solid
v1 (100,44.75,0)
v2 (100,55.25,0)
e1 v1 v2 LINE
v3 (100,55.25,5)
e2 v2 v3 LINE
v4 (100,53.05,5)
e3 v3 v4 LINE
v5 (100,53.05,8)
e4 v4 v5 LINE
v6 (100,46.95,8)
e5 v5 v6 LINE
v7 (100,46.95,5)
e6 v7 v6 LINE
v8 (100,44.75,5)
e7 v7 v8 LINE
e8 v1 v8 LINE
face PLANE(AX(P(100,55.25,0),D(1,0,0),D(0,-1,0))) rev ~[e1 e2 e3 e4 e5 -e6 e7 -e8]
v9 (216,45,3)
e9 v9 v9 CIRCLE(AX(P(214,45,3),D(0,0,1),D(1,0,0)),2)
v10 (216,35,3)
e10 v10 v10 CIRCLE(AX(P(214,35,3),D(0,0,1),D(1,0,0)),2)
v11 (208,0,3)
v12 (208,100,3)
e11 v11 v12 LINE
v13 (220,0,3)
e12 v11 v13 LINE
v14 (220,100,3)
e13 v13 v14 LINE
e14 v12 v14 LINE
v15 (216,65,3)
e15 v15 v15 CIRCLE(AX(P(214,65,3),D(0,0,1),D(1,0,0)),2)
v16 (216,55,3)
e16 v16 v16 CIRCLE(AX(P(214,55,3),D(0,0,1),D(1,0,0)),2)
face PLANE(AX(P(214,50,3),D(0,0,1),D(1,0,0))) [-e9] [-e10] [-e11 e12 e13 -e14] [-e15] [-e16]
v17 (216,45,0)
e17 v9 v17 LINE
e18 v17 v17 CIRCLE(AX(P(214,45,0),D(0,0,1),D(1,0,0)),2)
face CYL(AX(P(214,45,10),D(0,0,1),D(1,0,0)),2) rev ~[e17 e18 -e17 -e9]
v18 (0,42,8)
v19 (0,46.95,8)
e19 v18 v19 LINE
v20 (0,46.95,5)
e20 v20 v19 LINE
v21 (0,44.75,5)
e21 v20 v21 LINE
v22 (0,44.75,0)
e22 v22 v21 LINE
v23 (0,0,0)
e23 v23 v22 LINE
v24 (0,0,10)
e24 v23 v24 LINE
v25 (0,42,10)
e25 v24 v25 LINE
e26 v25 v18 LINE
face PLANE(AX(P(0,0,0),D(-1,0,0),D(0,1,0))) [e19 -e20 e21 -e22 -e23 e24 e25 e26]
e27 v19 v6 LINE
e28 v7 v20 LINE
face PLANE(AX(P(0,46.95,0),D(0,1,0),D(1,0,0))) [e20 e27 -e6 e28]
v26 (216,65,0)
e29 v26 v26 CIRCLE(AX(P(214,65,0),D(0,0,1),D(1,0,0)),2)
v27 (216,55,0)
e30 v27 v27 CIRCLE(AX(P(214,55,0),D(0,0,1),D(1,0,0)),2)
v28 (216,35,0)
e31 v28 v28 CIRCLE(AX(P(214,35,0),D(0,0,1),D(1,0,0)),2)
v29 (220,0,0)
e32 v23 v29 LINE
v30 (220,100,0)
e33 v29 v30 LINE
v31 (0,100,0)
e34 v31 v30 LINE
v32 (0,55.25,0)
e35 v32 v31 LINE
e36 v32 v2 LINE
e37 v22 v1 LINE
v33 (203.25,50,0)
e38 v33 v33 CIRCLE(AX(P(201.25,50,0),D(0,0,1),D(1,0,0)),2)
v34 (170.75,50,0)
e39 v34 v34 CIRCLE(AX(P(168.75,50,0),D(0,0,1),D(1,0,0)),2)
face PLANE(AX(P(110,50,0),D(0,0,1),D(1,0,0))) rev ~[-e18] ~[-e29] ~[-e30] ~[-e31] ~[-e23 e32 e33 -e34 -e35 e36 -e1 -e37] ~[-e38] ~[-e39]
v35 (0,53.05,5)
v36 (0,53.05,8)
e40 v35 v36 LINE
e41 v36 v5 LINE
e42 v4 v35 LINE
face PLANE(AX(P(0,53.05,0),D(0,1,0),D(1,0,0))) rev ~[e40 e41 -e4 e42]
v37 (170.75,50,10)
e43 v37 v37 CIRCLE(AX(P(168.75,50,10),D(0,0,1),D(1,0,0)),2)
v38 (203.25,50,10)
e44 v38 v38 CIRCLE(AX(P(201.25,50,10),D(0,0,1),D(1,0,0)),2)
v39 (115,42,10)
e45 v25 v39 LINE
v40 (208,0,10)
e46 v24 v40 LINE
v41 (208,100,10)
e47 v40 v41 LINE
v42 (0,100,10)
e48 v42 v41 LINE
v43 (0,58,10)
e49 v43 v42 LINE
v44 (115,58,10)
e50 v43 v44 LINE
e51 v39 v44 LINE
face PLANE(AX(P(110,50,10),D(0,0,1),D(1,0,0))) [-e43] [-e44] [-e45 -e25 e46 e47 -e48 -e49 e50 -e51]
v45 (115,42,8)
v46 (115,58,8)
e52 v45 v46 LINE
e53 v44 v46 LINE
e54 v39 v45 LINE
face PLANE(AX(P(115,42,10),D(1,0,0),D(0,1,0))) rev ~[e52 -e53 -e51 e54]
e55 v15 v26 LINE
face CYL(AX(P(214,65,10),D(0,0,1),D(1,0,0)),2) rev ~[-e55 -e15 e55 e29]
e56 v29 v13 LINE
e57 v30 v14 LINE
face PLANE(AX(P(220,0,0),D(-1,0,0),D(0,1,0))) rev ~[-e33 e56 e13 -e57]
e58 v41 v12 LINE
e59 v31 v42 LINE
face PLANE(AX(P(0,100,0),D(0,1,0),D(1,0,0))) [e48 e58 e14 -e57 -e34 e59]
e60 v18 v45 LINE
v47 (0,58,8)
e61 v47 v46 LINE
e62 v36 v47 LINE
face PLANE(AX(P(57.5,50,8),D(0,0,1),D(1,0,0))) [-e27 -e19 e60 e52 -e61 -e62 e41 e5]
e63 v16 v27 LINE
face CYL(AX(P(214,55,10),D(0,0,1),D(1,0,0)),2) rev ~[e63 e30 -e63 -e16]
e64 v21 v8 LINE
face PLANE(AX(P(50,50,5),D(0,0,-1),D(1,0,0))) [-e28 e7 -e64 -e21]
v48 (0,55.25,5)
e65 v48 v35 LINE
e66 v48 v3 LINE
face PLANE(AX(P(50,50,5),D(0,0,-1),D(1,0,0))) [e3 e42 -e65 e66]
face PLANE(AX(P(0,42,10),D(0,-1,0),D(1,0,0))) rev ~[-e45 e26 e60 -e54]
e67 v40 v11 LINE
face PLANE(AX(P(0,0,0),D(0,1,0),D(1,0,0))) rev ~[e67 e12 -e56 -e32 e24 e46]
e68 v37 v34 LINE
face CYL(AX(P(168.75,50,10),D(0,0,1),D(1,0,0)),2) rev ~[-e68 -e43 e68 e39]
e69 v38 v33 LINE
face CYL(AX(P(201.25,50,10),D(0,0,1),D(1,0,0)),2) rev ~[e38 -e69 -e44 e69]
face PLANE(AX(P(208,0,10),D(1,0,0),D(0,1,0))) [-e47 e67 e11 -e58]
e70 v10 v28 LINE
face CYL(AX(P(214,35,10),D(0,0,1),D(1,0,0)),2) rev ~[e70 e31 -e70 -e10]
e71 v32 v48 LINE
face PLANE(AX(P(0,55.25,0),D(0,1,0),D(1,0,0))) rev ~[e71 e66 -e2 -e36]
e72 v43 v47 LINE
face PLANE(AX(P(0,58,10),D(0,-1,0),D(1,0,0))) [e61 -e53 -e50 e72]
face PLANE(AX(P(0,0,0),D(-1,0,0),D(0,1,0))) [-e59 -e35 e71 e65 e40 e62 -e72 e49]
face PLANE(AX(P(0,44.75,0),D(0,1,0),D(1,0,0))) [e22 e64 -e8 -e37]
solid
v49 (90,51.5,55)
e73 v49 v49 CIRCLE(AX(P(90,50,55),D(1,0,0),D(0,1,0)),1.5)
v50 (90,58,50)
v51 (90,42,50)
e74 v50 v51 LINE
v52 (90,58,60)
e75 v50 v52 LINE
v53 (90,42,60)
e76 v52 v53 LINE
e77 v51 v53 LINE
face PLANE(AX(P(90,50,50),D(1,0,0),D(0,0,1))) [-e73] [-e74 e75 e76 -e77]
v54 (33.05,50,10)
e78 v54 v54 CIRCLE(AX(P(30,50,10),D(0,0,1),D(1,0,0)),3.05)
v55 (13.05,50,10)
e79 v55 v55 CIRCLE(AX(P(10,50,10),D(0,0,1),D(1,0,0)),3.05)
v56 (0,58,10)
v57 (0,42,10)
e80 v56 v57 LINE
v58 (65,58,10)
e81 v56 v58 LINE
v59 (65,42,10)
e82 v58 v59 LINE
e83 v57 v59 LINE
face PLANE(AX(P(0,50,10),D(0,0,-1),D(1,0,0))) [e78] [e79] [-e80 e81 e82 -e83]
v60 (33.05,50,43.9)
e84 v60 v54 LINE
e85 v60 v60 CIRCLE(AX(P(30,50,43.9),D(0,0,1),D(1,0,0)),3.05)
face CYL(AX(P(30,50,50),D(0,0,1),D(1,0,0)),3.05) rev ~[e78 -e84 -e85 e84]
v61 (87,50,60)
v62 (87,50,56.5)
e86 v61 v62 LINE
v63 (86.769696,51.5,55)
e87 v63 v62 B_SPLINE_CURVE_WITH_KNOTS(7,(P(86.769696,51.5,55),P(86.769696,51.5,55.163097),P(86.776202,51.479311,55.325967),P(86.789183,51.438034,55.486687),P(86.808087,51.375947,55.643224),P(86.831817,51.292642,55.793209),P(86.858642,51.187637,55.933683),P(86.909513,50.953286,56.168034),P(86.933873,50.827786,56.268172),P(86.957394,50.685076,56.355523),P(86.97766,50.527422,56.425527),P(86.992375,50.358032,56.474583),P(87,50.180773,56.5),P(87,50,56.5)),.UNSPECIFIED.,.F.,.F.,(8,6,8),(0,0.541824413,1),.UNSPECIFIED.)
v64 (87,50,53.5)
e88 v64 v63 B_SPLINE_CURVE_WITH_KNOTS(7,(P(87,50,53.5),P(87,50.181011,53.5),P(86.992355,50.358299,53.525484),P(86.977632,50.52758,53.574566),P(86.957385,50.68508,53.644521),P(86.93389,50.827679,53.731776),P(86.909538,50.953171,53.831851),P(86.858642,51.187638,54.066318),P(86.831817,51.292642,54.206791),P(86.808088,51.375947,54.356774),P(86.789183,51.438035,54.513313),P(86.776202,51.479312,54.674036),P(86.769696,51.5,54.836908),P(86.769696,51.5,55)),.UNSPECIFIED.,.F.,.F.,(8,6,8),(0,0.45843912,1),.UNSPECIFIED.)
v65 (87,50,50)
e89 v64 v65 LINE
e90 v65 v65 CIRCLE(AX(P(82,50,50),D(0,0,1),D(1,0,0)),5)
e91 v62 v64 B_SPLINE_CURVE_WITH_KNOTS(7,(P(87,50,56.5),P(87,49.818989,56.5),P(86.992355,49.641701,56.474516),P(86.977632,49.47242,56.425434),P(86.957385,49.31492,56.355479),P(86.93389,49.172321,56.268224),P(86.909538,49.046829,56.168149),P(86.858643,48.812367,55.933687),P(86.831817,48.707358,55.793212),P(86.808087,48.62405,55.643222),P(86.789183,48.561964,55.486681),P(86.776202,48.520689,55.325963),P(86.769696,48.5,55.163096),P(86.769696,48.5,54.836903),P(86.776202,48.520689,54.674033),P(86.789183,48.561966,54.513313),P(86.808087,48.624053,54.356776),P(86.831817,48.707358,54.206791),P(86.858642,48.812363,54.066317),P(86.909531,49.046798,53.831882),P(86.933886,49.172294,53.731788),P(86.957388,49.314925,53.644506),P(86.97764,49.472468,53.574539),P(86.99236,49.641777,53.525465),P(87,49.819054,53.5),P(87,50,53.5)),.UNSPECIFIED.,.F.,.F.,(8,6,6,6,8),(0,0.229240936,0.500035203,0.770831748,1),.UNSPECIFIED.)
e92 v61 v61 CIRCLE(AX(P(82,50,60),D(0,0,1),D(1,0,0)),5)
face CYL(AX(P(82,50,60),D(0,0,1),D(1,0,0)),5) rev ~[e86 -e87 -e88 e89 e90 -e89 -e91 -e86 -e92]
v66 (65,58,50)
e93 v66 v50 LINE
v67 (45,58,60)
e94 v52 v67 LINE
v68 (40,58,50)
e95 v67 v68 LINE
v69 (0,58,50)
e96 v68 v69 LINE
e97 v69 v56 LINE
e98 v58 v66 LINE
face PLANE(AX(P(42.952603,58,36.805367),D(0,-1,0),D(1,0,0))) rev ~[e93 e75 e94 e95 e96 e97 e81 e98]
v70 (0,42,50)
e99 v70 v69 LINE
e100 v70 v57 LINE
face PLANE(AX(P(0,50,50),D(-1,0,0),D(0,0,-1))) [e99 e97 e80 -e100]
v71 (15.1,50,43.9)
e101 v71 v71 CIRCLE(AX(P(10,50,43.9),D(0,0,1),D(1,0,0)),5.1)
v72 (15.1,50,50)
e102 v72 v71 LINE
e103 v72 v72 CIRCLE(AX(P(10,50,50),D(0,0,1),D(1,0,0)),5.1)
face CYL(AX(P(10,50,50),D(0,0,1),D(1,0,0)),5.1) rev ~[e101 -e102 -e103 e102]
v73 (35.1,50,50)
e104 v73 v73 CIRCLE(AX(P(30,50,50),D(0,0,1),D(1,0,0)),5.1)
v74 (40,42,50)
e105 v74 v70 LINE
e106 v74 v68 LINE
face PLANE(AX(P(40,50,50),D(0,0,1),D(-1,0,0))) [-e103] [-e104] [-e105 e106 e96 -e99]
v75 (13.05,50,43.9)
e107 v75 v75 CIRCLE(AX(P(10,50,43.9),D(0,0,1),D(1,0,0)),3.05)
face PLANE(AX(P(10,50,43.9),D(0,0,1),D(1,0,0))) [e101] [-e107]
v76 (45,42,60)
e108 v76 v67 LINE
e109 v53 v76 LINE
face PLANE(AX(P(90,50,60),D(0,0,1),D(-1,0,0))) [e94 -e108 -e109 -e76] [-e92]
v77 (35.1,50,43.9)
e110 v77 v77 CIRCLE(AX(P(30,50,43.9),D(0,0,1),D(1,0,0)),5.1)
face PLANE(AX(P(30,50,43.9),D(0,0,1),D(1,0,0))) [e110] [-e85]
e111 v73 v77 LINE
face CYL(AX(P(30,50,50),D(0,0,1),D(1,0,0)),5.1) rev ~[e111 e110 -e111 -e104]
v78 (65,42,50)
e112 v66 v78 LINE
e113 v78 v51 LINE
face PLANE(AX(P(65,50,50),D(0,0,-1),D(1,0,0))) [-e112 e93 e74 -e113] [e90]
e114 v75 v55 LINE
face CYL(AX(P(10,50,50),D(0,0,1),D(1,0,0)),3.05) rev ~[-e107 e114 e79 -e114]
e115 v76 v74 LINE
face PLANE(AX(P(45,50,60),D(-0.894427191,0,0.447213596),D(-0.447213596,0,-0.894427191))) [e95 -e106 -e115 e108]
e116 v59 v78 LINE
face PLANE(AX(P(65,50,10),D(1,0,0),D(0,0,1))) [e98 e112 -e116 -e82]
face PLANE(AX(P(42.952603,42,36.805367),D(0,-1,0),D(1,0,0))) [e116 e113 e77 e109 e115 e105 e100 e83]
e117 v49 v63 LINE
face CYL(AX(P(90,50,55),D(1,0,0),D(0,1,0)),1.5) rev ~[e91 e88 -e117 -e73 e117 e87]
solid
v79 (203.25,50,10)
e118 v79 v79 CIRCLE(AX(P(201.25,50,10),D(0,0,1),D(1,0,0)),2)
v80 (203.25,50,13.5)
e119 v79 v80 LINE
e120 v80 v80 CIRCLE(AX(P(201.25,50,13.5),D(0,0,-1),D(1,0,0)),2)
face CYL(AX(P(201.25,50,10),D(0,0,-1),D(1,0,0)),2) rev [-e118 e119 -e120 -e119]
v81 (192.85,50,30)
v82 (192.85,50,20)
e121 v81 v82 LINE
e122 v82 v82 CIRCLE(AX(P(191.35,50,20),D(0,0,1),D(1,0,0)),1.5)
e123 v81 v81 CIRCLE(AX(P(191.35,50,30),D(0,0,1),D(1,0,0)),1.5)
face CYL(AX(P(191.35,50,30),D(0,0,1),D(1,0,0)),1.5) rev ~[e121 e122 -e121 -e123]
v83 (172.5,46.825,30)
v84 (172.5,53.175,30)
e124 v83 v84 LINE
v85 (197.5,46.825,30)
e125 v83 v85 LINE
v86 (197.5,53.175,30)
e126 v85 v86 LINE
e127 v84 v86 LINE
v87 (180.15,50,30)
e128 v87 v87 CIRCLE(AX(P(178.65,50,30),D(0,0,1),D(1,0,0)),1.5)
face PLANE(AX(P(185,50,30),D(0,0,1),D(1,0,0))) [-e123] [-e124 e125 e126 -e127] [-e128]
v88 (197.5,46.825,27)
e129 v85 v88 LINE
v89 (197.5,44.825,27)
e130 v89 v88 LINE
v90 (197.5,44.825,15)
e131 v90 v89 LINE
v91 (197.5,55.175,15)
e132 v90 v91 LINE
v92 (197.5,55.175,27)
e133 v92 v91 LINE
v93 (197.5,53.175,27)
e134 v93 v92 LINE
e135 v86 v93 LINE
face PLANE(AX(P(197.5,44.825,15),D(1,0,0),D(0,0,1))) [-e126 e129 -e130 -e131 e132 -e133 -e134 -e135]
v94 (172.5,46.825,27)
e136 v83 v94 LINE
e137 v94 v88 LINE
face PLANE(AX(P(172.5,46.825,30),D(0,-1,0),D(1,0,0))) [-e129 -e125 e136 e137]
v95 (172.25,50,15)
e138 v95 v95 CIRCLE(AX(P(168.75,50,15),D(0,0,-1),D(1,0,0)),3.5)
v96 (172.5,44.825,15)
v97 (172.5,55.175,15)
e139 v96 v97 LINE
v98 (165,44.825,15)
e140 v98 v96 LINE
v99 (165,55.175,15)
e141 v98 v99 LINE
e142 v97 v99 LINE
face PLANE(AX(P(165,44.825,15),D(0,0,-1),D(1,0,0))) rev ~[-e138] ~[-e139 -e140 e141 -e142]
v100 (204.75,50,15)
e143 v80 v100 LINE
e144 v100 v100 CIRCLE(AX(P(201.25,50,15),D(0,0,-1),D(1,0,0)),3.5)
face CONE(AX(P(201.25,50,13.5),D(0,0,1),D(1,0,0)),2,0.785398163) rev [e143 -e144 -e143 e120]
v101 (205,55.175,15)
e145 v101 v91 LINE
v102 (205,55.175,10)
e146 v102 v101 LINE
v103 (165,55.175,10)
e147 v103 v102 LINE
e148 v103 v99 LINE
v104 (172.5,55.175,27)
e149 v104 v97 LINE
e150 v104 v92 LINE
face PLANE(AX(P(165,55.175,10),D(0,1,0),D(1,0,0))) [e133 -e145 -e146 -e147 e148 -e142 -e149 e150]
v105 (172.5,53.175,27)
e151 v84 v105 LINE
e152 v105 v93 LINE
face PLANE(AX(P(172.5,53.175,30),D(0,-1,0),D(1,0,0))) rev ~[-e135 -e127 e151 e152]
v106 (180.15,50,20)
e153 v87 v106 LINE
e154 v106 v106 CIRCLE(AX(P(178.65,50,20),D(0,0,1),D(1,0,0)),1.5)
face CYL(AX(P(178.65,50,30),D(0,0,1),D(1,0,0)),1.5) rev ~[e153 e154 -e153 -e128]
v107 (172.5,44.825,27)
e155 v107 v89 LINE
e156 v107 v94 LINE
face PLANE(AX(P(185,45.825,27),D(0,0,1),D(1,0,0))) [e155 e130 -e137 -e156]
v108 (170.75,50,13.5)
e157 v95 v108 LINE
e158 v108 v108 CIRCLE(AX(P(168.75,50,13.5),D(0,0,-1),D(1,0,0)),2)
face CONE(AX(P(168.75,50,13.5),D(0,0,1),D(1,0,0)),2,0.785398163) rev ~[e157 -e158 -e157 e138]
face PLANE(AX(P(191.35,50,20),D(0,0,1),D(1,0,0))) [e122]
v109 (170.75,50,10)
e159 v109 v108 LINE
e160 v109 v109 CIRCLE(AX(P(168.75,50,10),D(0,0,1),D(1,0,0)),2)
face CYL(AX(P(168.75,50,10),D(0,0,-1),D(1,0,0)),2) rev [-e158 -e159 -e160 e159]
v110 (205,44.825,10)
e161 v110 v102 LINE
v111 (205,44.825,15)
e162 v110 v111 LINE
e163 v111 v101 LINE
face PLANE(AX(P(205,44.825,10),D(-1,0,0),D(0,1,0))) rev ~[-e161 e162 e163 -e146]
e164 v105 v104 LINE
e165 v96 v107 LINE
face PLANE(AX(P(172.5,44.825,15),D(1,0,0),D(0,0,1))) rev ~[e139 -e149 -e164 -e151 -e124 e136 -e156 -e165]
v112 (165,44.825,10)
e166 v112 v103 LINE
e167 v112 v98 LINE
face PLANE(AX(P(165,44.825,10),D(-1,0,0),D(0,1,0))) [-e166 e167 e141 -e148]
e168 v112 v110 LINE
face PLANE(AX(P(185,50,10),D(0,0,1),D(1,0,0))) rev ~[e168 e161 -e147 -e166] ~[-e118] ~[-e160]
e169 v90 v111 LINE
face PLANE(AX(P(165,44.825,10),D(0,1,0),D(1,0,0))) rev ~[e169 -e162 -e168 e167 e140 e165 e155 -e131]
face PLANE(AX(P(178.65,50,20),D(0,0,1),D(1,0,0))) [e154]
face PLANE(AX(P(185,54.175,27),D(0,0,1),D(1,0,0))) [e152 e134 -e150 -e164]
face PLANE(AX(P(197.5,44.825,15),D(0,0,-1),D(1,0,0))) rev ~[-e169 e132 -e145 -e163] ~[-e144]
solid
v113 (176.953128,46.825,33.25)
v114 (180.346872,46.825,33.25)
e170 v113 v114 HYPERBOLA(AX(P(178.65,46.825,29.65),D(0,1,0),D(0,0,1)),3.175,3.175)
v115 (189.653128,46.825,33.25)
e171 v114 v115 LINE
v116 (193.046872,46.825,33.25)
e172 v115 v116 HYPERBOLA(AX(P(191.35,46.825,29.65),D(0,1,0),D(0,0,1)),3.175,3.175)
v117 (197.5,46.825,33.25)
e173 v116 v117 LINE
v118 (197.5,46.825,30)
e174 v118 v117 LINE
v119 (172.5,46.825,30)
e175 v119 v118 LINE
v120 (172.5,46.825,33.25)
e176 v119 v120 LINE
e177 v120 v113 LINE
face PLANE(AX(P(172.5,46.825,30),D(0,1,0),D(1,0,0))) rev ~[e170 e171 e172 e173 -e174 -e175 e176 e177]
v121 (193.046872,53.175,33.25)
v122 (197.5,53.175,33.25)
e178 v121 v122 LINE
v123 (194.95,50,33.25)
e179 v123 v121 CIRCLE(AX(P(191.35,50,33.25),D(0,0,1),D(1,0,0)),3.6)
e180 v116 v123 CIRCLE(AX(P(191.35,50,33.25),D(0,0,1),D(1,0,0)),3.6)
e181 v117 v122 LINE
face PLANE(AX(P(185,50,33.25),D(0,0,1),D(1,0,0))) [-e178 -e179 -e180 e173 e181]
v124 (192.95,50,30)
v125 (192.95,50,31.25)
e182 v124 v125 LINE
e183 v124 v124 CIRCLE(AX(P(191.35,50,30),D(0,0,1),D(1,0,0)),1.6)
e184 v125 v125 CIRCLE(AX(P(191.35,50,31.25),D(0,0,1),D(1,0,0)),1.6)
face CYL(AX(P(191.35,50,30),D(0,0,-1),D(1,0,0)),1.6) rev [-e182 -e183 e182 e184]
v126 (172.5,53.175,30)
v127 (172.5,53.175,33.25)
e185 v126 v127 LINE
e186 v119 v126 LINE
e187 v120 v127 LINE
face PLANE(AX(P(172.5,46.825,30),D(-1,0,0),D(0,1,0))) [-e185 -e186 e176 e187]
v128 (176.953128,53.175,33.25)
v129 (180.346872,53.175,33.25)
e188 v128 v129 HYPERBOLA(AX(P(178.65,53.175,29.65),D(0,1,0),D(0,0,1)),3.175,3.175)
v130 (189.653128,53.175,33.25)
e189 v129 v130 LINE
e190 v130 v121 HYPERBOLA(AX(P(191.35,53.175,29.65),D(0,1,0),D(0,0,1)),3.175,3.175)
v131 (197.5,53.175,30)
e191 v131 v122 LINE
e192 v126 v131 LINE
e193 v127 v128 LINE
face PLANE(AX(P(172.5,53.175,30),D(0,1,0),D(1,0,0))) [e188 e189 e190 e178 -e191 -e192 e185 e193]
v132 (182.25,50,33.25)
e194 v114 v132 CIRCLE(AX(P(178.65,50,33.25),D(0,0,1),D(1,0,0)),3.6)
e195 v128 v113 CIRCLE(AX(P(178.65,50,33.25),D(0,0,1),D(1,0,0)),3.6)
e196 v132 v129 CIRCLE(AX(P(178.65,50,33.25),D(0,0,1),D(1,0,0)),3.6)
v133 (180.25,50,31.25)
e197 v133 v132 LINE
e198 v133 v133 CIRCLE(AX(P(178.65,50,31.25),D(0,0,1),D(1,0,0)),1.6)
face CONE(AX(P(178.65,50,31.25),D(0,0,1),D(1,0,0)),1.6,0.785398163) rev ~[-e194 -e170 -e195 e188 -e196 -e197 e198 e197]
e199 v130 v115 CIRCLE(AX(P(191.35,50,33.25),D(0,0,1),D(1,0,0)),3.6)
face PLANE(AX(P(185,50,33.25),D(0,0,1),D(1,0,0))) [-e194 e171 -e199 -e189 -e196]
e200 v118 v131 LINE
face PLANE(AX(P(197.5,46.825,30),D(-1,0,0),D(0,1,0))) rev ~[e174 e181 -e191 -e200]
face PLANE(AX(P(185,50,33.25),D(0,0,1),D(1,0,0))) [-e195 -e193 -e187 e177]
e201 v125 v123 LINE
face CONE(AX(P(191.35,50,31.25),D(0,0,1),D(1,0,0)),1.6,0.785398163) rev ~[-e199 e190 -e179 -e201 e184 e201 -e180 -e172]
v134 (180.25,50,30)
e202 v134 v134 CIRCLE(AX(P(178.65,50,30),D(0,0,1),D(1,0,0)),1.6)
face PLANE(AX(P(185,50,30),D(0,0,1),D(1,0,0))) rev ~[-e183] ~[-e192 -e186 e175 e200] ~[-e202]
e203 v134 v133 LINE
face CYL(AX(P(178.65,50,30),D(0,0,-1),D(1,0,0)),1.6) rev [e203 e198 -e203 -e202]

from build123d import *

# Parameters (mm, degrees)
F0_W      = 220
F0_H      = 100
F1_DEPTH  = 10
F2_W      = 40
F2_H      = 10.35
F2_R      = 2
F3_DEPTH  = 20
F4_W      = 7.5
F4_H      = 15
F5_DEPTH  = 55.176
F6_R      = 1.5
F7_DEPTH  = 10
F8_W      = 25
F8_H      = 2
F9_DEPTH  = 3
F10_SIZE  = 1.5
F11_R     = 2
F12_DEPTH = 10.001
F13_W     = 25
F13_H     = 6.35
F13_R     = 1.6
F14_DEPTH = 3.25
F16_W     = 100
F16_H     = 6.1
F17_DEPTH = 25
F18_W     = 100
F18_H     = 10.5
F19_DEPTH = 5
F20_R     = 2
F21_DEPTH = 10.001
F24_DEPTH = 8
F25_R     = 3.05
F26_DEPTH = 40
F27_R     = 5.1
F28_DEPTH = 6.1
F29_R     = 5
F30_DEPTH = 10
F31_R     = 1.5
F32_DEPTH = 3.2313040929
F33_W     = 12
F33_H     = 100
F34_DEPTH = 7
F35_W     = 115
F35_H     = 16
F36_DEPTH = 2


# Not quite as in the source:
# - a fillet or chamfer that OpenCascade refuses, or shapes differently, is made with other operations: its cross-section is extruded or revolved along the edge and cut away or added


with BuildPart() as f1:
    # F0 (on Top) → F1 (new body)
    with BuildSketch(Plane.XY):
        with Locations((110, 50)):
            Rectangle(F0_W, F0_H)
    extrude(amount=F1_DEPTH)

    # F11 (on face) → F12 (cut, through all)
    with BuildSketch(Plane.XY.offset(10)):
        with Locations((168.75, 50)):
            Circle(F11_R)
        with Locations((201.25, 50)):
            Circle(F11_R)
        with Locations((214, 65)):
            Circle(F11_R)
        with Locations((214, 55)):
            Circle(F11_R)
        with Locations((214, 45)):
            Circle(F11_R)
        with Locations((214, 35)):
            Circle(F11_R)
    extrude(amount=-F12_DEPTH, mode=Mode.SUBTRACT)

    # F16 (on face) → F17 (cut)
    with BuildSketch(Plane(origin=(0, 0, 0), x_dir=(1, 0, 0), z_dir=(0, 0, -1))):
        with Locations((50, -50)):
            Rectangle(F16_W, F16_H)
    extrude(amount=-F17_DEPTH, mode=Mode.SUBTRACT)

    # F18 (on face) → F19 (cut)
    with BuildSketch(Plane(origin=(0, 0, 0), x_dir=(1, 0, 0), z_dir=(0, 0, -1))):
        with Locations((50, -50)):
            Rectangle(F18_W, F18_H)
    extrude(amount=-F19_DEPTH, mode=Mode.SUBTRACT)

    # F20 (on face) → F21 (cut, through all)
    with BuildSketch(Plane.XY.offset(10)):
        with Locations((168.75, 50)):
            Circle(F20_R)
        with Locations((201.25, 50)):
            Circle(F20_R)
    extrude(amount=-F21_DEPTH, mode=Mode.SUBTRACT)

    # F33 (on face) → F34 (cut)
    with BuildSketch(Plane.XY.offset(10)):
        with Locations((214, 50)):
            Rectangle(F33_W, F33_H)
    extrude(amount=-F34_DEPTH, mode=Mode.SUBTRACT)

    # F35 (on face) → F36 (cut)
    with BuildSketch(Plane.XY.offset(10)):
        with Locations((57.5, 50)):
            Rectangle(F35_W, F35_H)
    extrude(amount=-F36_DEPTH, mode=Mode.SUBTRACT)


with BuildPart() as f3:
    # F2 (on face) → F3 (new body)
    with BuildSketch(Plane.XY.offset(10)):
        with Locations((185, 50)):
            Rectangle(F2_W, F2_H)
        with Locations((168.75, 50)):
            Circle(F2_R, mode=Mode.SUBTRACT)
        with Locations((201.25, 50)):
            Circle(F2_R, mode=Mode.SUBTRACT)
    extrude(amount=F3_DEPTH)

    # F4 (on face) → F5 (cut, through all)
    with BuildSketch(Plane.XZ.offset(-44.825)):
        with Locations((168.75, 22.5)):
            Rectangle(F4_W, F4_H)
        with Locations((201.25, 22.5)):
            Rectangle(F4_W, F4_H)
    extrude(amount=-F5_DEPTH, mode=Mode.SUBTRACT)

    # F6 (on face) → F7 (cut)
    with BuildSketch(Plane.XY.offset(30)):
        with Locations((178.65, 50)):
            Circle(F6_R)
        with Locations((191.35, 50)):
            Circle(F6_R)
    extrude(amount=-F7_DEPTH, mode=Mode.SUBTRACT)

    # F8 (on face) → F9 (cut)
    with BuildSketch(Plane.XY.offset(30)):
        with Locations((185, 54.175)):
            Rectangle(F8_W, F8_H)
        with Locations((185, 45.825)):
            Rectangle(F8_W, F8_H)
    extrude(amount=-F9_DEPTH, mode=Mode.SUBTRACT)

    # F10
    f10_edges = [f3.edges().sort_by_distance(p)[0] for p in [
        (166.75, 50, 15),
        (199.25, 50, 15),
    ]]
    chamfer(f10_edges, length=F10_SIZE)


with BuildPart() as f14:
    # F13 (on face) → F14 (new body)
    with BuildSketch(Plane.XY.offset(30)):
        with Locations((185, 50)):
            Rectangle(F13_W, F13_H)
        with Locations((178.65, 50)):
            Circle(F13_R, mode=Mode.SUBTRACT)
        with Locations((191.35, 50)):
            Circle(F13_R, mode=Mode.SUBTRACT)
    extrude(amount=F14_DEPTH)

    # F15: chamfer of 2 on 2 edges, made by hand

    # F15_s1 → F15_t2 (revolve, cut)
    with BuildSketch(Plane.XZ.offset(-50)):
        Polygon((180.25, 31.25), (182.25, 33.25), (180.25, 33.25), align=None)
    revolve(axis=Axis((178.65, 50, 33.25), (0, 0, 1)), mode=Mode.SUBTRACT)

    # F15_s3 → F15_t4 (revolve, cut)
    with BuildSketch(Plane.XZ.offset(-50)):
        Polygon((192.95, 31.25), (194.95, 33.25), (192.95, 33.25), align=None)
    revolve(axis=Axis((191.35, 50, 33.25), (0, 0, 1)), mode=Mode.SUBTRACT)


with BuildPart() as f24:
    # F23 (on offset) → F24 (new body, symmetric)
    with BuildSketch(Plane.XZ.offset(-50)):
        Polygon((0, 50), (0, 10), (65, 10), (65, 50), (90, 50), (90, 60), (45, 60), (40, 50), align=None)
    extrude(amount=F24_DEPTH, both=True)

    # F25 (on face) → F26 (cut, through all)
    with BuildSketch(Plane.XY.offset(50)):
        with Locations((10, 50)):
            Circle(F25_R)
        with Locations((30, 50)):
            Circle(F25_R)
    extrude(amount=-F26_DEPTH, mode=Mode.SUBTRACT)

    # F27 (on face) → F28 (cut)
    with BuildSketch(Plane.XY.offset(50)):
        with Locations((10, 50)):
            Circle(F27_R)
        with Locations((30, 50)):
            Circle(F27_R)
    extrude(amount=-F28_DEPTH, mode=Mode.SUBTRACT)

    # F29 (on face) → F30 (cut, through all)
    with BuildSketch(Plane.XY.offset(60)):
        with Locations((82, 50)):
            Circle(F29_R)
    extrude(amount=-F30_DEPTH, mode=Mode.SUBTRACT)

    # F31 (on face) → F32 (cut, through all)
    with BuildSketch(Plane.YZ.offset(90)):
        with Locations((50, 55)):
            Circle(F31_R)
    extrude(amount=-F32_DEPTH, mode=Mode.SUBTRACT)


solid = Compound([f1.part, f3.part, f14.part, f24.part])
